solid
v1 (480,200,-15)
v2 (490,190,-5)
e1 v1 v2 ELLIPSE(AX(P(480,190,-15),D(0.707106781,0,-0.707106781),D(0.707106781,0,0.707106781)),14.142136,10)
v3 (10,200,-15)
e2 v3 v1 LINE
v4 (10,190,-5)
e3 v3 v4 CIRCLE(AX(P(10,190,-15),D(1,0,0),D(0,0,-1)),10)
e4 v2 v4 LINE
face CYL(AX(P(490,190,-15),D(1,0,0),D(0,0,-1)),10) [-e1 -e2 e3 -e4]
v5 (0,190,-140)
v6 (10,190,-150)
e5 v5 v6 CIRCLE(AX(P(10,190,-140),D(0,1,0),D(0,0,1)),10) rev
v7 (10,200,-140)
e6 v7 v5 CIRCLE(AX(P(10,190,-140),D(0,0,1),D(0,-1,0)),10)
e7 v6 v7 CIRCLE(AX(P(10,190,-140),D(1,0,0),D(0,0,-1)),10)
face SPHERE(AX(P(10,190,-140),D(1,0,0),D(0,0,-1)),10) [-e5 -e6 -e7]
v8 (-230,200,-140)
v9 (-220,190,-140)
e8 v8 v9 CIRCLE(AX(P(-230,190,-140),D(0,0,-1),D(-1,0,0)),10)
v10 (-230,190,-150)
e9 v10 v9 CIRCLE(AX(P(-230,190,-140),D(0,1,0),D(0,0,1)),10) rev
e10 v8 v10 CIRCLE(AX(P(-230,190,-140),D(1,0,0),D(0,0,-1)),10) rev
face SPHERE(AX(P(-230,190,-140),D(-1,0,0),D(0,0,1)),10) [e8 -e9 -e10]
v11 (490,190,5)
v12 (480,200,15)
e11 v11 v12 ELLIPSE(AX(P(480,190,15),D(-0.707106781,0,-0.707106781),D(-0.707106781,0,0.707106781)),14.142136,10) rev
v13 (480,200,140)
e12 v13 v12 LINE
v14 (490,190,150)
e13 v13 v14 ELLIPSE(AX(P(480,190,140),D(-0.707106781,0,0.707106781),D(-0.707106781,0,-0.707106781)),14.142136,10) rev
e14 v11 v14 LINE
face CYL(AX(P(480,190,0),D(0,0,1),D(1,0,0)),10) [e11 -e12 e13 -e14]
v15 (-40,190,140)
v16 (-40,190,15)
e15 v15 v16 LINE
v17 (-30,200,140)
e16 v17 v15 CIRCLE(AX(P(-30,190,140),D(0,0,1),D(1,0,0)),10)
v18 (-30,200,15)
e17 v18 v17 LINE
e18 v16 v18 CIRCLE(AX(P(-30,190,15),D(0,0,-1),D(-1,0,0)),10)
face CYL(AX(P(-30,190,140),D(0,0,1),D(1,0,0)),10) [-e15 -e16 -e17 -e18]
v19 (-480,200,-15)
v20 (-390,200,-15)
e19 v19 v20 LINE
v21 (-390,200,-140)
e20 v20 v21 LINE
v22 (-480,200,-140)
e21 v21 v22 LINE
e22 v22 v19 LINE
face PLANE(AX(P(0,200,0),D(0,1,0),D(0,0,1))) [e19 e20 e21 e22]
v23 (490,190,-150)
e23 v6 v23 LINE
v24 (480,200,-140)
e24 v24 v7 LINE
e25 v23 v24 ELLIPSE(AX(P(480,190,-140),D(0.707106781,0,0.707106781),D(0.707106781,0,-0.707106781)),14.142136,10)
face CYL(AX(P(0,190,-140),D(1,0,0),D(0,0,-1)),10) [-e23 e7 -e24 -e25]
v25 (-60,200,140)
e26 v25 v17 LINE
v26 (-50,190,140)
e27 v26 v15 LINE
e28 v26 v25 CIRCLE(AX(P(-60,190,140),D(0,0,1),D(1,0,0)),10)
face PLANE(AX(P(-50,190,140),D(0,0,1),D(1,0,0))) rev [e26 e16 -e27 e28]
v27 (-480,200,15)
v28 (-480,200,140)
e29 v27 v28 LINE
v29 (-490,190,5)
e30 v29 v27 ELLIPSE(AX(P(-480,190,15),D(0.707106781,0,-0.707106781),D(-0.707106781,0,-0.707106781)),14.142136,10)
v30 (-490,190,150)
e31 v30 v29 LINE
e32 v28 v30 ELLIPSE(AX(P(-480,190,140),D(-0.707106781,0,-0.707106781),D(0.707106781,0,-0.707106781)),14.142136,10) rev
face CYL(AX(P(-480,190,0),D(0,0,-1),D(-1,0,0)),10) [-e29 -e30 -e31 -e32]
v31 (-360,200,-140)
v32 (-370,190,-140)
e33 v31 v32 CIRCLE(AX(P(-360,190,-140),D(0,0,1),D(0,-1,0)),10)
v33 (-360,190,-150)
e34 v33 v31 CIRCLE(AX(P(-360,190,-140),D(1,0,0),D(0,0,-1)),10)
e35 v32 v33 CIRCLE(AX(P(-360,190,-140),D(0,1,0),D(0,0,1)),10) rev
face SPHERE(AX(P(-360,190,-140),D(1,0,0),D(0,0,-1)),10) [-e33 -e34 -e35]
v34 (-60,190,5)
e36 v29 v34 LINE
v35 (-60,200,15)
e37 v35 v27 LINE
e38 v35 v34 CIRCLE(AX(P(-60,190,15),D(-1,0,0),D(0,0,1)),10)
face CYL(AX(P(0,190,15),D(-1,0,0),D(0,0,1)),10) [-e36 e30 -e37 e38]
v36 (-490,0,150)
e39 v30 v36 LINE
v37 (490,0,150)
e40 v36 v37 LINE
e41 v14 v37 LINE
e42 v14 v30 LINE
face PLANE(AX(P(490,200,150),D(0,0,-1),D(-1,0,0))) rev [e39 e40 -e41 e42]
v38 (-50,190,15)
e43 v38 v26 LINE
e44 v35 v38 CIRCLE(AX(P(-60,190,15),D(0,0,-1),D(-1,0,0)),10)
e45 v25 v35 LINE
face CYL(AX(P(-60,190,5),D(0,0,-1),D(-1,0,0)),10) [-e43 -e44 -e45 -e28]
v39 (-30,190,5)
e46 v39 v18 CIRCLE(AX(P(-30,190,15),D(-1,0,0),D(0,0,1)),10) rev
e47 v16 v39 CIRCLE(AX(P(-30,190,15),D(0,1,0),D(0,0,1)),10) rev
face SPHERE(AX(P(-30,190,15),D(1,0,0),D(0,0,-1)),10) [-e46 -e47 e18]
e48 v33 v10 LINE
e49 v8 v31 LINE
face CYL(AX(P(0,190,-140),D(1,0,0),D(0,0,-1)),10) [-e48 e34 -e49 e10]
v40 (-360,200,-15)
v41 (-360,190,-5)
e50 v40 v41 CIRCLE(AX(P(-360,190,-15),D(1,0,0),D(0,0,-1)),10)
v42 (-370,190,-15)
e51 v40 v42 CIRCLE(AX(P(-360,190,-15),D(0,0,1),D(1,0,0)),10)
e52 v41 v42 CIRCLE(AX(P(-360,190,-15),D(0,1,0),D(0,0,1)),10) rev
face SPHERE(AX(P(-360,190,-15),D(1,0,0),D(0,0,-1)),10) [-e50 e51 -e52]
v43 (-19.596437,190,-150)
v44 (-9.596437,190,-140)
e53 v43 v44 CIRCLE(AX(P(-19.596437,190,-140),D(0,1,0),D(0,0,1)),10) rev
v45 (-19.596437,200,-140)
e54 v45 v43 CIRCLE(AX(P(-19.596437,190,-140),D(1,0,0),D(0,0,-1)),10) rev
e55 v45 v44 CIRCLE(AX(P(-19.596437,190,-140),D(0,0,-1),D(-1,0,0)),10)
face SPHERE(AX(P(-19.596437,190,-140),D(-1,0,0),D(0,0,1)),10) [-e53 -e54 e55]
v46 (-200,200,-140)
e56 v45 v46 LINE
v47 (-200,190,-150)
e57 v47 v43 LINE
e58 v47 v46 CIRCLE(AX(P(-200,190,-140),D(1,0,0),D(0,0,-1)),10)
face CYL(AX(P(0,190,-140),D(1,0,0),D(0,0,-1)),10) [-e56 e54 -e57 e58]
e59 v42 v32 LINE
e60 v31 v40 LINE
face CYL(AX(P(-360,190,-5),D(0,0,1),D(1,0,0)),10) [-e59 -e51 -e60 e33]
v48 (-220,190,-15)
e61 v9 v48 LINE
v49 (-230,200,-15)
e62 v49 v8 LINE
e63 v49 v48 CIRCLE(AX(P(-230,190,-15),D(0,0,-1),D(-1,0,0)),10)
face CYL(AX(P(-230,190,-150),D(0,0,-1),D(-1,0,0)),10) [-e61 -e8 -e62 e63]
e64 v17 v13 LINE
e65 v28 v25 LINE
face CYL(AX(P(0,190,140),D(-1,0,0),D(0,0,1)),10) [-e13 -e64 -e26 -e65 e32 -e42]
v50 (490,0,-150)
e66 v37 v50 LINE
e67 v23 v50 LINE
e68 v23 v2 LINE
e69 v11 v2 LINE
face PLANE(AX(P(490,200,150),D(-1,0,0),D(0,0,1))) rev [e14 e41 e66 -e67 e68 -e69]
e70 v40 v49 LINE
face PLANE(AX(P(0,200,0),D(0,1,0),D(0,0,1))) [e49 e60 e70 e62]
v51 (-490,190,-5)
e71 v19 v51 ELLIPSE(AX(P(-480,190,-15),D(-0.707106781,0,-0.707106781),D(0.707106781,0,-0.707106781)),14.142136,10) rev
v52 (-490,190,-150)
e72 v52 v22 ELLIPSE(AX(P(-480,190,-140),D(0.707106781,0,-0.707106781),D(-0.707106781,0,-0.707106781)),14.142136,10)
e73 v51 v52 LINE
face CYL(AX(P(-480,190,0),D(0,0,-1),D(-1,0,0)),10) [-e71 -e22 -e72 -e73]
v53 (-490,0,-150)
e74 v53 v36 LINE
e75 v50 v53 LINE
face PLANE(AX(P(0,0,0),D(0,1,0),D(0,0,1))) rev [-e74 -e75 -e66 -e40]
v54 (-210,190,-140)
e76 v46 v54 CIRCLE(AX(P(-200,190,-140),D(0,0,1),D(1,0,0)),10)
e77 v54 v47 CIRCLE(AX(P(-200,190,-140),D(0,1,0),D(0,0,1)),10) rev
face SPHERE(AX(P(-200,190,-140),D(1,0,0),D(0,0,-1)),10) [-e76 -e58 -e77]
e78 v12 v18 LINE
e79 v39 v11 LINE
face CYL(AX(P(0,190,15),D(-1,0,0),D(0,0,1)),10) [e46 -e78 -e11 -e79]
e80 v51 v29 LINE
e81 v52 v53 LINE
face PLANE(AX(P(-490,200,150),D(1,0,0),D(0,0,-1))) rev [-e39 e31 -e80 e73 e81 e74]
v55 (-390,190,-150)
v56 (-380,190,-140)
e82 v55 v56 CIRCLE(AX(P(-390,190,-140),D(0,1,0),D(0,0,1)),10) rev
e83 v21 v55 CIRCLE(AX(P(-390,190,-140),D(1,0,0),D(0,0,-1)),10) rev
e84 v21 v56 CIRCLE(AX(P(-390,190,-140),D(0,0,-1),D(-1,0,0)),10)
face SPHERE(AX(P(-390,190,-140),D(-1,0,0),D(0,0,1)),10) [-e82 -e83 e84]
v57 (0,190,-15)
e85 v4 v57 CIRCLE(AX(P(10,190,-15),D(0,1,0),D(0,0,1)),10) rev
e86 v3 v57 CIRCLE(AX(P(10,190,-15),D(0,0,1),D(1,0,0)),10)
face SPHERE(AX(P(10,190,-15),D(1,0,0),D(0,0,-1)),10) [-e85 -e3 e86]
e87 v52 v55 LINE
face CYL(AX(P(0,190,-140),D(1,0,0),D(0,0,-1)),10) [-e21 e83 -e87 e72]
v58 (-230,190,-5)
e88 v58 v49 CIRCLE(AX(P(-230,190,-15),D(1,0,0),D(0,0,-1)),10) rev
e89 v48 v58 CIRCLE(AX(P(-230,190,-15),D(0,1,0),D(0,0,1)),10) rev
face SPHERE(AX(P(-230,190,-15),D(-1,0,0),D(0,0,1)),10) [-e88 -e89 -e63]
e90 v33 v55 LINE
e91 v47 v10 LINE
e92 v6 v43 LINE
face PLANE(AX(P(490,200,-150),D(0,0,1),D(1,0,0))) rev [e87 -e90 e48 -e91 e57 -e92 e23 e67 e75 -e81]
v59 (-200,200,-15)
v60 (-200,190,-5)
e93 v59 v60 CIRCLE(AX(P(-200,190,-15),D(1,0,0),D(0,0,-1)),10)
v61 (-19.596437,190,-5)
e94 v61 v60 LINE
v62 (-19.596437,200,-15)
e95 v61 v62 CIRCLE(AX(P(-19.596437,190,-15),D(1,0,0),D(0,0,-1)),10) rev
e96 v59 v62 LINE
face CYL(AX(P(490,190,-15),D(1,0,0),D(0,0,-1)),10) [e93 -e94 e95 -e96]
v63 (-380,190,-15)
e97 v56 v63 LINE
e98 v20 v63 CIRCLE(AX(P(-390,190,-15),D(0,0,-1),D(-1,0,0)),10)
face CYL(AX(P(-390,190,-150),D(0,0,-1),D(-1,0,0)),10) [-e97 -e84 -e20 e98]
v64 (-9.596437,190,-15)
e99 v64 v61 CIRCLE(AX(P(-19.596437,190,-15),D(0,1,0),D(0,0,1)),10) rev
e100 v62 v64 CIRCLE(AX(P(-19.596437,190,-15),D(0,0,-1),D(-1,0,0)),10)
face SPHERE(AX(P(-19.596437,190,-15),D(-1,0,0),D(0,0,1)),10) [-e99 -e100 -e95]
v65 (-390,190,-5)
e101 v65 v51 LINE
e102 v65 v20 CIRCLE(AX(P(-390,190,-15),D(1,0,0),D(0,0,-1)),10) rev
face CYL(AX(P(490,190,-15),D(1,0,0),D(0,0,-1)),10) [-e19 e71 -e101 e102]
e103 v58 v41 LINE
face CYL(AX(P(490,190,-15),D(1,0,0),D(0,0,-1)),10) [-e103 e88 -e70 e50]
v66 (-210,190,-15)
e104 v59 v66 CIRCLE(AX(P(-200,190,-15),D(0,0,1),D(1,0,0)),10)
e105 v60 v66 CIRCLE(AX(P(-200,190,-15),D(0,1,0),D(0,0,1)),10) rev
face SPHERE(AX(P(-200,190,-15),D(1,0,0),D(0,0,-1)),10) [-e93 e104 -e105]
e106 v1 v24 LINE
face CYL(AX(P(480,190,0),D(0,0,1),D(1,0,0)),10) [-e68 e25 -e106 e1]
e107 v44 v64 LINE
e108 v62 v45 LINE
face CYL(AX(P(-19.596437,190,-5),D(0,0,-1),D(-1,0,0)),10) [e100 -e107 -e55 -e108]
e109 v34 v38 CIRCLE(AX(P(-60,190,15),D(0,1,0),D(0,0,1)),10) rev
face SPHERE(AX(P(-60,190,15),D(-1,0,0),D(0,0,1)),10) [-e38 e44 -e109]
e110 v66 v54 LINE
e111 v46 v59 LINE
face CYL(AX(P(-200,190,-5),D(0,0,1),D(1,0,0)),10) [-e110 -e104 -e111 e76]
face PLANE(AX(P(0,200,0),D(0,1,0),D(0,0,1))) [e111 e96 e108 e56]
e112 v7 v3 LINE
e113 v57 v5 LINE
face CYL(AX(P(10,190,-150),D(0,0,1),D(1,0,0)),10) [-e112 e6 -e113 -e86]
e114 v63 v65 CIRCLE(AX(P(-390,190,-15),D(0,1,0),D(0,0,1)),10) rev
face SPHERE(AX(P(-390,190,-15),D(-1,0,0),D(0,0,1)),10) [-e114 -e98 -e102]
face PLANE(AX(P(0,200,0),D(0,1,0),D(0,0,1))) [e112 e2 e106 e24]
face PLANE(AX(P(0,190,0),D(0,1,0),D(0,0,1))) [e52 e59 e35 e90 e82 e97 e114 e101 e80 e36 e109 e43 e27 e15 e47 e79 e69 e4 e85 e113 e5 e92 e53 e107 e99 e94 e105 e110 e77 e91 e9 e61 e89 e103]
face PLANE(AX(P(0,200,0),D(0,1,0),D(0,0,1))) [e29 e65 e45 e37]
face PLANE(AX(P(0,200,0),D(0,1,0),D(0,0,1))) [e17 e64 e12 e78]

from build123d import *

# Parameters (mm, degrees)
SKETCH1_W           = 980
SKETCH1_H           = 300
BOSS_EXTRUDE1_DEPTH = 200
CUT_EXTRUDE1_DEPTH  = 10
FILLET1_R           = 10
SKETCH3_W           = 10
SKETCH3_H           = 145
SKETCH3_W_2         = 9.596436682
SKETCH3_H_2         = 135
CUT_EXTRUDE2_DEPTH  = 10
FILLET2_R           = 10


with BuildPart() as part:
    # Sketch1 → Boss-Extrude1 (new body)
    with BuildSketch(Plane(origin=(0, 0, 0), x_dir=(1, 0, 0), z_dir=(0, 1, 0))):
        Rectangle(SKETCH1_W, SKETCH1_H)
    extrude(amount=BOSS_EXTRUDE1_DEPTH)

    # Sketch2 → Cut-Extrude1 (cut)
    with BuildSketch(Plane(origin=(0, 200, 0), x_dir=(1, 0, 0), z_dir=(0, 1, 0))):
        Polygon((0, -5), (490, -5), (490, 5), (-490, 5), (-490, -5), align=None)
    extrude(amount=-CUT_EXTRUDE1_DEPTH, mode=Mode.SUBTRACT)

    # Fillet1
    fillet1_edges = [part.edges().sort_by_distance(p)[0] for p in [
        (490, 200, 77.5),
        (490, 200, -77.5),
        (0, 200, -150),
        (0, 200, 150),
        (0, 200, -5),
        (0, 200, 5),
        (-490, 200, -77.5),
        (-490, 200, 77.5),
    ]]
    fillet(fillet1_edges, radius=FILLET1_R - 0.0001)  # a hair under: the kernel refuses the full size

    # Sketch3 → Cut-Extrude2 (cut)
    with BuildSketch(Plane(origin=(0, 200, 0), x_dir=(1, 0, 0), z_dir=(0, 1, 0))):
        with Locations((-375, 77.5)):
            Rectangle(SKETCH3_W, SKETCH3_H)
        with Locations((-215, 77.5)):
            Rectangle(SKETCH3_W, SKETCH3_H)
        with Locations((-4.798218341, 77.5)):
            Rectangle(SKETCH3_W_2, SKETCH3_H)
        with Locations((-45, -72.5)):
            Rectangle(SKETCH3_W, SKETCH3_H_2)
    extrude(amount=-CUT_EXTRUDE2_DEPTH, mode=Mode.SUBTRACT)

    # Fillet2
    fillet2_edges = [part.edges().sort_by_distance(p)[0] for p in [
        (-50, 200, 77.49995),
        (-40, 200, 77.49995),
        (0, 200, -77.5),
        (-9.596436682, 200, -77.5),
        (-210, 200, -77.5),
        (-380, 200, -77.5),
        (-220, 200, -77.5),
        (-370, 200, -77.5),
        (-50, 197.071097101, 7.928902899),
        (-40, 197.071097101, 7.928902899),
        (0, 197.071097101, -7.928902899),
        (0, 197.071097101, -147.071097101),
        (-9.596436682, 197.071097101, -147.071097101),
        (-9.596436682, 197.071097101, -7.928902899),
        (-210, 197.071097101, -7.928902899),
        (-210, 197.071097101, -147.071097101),
        (-380, 197.071097101, -147.071097101),
        (-380, 197.071097101, -7.928902899),
        (-220, 197.071097101, -147.071097101),
        (-220, 197.071097101, -7.928902899),
        (-370, 197.071097101, -7.928902899),
        (-370, 197.071097101, -147.071097101),
    ]]
    fillet(fillet2_edges, radius=FILLET2_R - 0.0001)  # a hair under: the kernel refuses the full size


solid = part.part
